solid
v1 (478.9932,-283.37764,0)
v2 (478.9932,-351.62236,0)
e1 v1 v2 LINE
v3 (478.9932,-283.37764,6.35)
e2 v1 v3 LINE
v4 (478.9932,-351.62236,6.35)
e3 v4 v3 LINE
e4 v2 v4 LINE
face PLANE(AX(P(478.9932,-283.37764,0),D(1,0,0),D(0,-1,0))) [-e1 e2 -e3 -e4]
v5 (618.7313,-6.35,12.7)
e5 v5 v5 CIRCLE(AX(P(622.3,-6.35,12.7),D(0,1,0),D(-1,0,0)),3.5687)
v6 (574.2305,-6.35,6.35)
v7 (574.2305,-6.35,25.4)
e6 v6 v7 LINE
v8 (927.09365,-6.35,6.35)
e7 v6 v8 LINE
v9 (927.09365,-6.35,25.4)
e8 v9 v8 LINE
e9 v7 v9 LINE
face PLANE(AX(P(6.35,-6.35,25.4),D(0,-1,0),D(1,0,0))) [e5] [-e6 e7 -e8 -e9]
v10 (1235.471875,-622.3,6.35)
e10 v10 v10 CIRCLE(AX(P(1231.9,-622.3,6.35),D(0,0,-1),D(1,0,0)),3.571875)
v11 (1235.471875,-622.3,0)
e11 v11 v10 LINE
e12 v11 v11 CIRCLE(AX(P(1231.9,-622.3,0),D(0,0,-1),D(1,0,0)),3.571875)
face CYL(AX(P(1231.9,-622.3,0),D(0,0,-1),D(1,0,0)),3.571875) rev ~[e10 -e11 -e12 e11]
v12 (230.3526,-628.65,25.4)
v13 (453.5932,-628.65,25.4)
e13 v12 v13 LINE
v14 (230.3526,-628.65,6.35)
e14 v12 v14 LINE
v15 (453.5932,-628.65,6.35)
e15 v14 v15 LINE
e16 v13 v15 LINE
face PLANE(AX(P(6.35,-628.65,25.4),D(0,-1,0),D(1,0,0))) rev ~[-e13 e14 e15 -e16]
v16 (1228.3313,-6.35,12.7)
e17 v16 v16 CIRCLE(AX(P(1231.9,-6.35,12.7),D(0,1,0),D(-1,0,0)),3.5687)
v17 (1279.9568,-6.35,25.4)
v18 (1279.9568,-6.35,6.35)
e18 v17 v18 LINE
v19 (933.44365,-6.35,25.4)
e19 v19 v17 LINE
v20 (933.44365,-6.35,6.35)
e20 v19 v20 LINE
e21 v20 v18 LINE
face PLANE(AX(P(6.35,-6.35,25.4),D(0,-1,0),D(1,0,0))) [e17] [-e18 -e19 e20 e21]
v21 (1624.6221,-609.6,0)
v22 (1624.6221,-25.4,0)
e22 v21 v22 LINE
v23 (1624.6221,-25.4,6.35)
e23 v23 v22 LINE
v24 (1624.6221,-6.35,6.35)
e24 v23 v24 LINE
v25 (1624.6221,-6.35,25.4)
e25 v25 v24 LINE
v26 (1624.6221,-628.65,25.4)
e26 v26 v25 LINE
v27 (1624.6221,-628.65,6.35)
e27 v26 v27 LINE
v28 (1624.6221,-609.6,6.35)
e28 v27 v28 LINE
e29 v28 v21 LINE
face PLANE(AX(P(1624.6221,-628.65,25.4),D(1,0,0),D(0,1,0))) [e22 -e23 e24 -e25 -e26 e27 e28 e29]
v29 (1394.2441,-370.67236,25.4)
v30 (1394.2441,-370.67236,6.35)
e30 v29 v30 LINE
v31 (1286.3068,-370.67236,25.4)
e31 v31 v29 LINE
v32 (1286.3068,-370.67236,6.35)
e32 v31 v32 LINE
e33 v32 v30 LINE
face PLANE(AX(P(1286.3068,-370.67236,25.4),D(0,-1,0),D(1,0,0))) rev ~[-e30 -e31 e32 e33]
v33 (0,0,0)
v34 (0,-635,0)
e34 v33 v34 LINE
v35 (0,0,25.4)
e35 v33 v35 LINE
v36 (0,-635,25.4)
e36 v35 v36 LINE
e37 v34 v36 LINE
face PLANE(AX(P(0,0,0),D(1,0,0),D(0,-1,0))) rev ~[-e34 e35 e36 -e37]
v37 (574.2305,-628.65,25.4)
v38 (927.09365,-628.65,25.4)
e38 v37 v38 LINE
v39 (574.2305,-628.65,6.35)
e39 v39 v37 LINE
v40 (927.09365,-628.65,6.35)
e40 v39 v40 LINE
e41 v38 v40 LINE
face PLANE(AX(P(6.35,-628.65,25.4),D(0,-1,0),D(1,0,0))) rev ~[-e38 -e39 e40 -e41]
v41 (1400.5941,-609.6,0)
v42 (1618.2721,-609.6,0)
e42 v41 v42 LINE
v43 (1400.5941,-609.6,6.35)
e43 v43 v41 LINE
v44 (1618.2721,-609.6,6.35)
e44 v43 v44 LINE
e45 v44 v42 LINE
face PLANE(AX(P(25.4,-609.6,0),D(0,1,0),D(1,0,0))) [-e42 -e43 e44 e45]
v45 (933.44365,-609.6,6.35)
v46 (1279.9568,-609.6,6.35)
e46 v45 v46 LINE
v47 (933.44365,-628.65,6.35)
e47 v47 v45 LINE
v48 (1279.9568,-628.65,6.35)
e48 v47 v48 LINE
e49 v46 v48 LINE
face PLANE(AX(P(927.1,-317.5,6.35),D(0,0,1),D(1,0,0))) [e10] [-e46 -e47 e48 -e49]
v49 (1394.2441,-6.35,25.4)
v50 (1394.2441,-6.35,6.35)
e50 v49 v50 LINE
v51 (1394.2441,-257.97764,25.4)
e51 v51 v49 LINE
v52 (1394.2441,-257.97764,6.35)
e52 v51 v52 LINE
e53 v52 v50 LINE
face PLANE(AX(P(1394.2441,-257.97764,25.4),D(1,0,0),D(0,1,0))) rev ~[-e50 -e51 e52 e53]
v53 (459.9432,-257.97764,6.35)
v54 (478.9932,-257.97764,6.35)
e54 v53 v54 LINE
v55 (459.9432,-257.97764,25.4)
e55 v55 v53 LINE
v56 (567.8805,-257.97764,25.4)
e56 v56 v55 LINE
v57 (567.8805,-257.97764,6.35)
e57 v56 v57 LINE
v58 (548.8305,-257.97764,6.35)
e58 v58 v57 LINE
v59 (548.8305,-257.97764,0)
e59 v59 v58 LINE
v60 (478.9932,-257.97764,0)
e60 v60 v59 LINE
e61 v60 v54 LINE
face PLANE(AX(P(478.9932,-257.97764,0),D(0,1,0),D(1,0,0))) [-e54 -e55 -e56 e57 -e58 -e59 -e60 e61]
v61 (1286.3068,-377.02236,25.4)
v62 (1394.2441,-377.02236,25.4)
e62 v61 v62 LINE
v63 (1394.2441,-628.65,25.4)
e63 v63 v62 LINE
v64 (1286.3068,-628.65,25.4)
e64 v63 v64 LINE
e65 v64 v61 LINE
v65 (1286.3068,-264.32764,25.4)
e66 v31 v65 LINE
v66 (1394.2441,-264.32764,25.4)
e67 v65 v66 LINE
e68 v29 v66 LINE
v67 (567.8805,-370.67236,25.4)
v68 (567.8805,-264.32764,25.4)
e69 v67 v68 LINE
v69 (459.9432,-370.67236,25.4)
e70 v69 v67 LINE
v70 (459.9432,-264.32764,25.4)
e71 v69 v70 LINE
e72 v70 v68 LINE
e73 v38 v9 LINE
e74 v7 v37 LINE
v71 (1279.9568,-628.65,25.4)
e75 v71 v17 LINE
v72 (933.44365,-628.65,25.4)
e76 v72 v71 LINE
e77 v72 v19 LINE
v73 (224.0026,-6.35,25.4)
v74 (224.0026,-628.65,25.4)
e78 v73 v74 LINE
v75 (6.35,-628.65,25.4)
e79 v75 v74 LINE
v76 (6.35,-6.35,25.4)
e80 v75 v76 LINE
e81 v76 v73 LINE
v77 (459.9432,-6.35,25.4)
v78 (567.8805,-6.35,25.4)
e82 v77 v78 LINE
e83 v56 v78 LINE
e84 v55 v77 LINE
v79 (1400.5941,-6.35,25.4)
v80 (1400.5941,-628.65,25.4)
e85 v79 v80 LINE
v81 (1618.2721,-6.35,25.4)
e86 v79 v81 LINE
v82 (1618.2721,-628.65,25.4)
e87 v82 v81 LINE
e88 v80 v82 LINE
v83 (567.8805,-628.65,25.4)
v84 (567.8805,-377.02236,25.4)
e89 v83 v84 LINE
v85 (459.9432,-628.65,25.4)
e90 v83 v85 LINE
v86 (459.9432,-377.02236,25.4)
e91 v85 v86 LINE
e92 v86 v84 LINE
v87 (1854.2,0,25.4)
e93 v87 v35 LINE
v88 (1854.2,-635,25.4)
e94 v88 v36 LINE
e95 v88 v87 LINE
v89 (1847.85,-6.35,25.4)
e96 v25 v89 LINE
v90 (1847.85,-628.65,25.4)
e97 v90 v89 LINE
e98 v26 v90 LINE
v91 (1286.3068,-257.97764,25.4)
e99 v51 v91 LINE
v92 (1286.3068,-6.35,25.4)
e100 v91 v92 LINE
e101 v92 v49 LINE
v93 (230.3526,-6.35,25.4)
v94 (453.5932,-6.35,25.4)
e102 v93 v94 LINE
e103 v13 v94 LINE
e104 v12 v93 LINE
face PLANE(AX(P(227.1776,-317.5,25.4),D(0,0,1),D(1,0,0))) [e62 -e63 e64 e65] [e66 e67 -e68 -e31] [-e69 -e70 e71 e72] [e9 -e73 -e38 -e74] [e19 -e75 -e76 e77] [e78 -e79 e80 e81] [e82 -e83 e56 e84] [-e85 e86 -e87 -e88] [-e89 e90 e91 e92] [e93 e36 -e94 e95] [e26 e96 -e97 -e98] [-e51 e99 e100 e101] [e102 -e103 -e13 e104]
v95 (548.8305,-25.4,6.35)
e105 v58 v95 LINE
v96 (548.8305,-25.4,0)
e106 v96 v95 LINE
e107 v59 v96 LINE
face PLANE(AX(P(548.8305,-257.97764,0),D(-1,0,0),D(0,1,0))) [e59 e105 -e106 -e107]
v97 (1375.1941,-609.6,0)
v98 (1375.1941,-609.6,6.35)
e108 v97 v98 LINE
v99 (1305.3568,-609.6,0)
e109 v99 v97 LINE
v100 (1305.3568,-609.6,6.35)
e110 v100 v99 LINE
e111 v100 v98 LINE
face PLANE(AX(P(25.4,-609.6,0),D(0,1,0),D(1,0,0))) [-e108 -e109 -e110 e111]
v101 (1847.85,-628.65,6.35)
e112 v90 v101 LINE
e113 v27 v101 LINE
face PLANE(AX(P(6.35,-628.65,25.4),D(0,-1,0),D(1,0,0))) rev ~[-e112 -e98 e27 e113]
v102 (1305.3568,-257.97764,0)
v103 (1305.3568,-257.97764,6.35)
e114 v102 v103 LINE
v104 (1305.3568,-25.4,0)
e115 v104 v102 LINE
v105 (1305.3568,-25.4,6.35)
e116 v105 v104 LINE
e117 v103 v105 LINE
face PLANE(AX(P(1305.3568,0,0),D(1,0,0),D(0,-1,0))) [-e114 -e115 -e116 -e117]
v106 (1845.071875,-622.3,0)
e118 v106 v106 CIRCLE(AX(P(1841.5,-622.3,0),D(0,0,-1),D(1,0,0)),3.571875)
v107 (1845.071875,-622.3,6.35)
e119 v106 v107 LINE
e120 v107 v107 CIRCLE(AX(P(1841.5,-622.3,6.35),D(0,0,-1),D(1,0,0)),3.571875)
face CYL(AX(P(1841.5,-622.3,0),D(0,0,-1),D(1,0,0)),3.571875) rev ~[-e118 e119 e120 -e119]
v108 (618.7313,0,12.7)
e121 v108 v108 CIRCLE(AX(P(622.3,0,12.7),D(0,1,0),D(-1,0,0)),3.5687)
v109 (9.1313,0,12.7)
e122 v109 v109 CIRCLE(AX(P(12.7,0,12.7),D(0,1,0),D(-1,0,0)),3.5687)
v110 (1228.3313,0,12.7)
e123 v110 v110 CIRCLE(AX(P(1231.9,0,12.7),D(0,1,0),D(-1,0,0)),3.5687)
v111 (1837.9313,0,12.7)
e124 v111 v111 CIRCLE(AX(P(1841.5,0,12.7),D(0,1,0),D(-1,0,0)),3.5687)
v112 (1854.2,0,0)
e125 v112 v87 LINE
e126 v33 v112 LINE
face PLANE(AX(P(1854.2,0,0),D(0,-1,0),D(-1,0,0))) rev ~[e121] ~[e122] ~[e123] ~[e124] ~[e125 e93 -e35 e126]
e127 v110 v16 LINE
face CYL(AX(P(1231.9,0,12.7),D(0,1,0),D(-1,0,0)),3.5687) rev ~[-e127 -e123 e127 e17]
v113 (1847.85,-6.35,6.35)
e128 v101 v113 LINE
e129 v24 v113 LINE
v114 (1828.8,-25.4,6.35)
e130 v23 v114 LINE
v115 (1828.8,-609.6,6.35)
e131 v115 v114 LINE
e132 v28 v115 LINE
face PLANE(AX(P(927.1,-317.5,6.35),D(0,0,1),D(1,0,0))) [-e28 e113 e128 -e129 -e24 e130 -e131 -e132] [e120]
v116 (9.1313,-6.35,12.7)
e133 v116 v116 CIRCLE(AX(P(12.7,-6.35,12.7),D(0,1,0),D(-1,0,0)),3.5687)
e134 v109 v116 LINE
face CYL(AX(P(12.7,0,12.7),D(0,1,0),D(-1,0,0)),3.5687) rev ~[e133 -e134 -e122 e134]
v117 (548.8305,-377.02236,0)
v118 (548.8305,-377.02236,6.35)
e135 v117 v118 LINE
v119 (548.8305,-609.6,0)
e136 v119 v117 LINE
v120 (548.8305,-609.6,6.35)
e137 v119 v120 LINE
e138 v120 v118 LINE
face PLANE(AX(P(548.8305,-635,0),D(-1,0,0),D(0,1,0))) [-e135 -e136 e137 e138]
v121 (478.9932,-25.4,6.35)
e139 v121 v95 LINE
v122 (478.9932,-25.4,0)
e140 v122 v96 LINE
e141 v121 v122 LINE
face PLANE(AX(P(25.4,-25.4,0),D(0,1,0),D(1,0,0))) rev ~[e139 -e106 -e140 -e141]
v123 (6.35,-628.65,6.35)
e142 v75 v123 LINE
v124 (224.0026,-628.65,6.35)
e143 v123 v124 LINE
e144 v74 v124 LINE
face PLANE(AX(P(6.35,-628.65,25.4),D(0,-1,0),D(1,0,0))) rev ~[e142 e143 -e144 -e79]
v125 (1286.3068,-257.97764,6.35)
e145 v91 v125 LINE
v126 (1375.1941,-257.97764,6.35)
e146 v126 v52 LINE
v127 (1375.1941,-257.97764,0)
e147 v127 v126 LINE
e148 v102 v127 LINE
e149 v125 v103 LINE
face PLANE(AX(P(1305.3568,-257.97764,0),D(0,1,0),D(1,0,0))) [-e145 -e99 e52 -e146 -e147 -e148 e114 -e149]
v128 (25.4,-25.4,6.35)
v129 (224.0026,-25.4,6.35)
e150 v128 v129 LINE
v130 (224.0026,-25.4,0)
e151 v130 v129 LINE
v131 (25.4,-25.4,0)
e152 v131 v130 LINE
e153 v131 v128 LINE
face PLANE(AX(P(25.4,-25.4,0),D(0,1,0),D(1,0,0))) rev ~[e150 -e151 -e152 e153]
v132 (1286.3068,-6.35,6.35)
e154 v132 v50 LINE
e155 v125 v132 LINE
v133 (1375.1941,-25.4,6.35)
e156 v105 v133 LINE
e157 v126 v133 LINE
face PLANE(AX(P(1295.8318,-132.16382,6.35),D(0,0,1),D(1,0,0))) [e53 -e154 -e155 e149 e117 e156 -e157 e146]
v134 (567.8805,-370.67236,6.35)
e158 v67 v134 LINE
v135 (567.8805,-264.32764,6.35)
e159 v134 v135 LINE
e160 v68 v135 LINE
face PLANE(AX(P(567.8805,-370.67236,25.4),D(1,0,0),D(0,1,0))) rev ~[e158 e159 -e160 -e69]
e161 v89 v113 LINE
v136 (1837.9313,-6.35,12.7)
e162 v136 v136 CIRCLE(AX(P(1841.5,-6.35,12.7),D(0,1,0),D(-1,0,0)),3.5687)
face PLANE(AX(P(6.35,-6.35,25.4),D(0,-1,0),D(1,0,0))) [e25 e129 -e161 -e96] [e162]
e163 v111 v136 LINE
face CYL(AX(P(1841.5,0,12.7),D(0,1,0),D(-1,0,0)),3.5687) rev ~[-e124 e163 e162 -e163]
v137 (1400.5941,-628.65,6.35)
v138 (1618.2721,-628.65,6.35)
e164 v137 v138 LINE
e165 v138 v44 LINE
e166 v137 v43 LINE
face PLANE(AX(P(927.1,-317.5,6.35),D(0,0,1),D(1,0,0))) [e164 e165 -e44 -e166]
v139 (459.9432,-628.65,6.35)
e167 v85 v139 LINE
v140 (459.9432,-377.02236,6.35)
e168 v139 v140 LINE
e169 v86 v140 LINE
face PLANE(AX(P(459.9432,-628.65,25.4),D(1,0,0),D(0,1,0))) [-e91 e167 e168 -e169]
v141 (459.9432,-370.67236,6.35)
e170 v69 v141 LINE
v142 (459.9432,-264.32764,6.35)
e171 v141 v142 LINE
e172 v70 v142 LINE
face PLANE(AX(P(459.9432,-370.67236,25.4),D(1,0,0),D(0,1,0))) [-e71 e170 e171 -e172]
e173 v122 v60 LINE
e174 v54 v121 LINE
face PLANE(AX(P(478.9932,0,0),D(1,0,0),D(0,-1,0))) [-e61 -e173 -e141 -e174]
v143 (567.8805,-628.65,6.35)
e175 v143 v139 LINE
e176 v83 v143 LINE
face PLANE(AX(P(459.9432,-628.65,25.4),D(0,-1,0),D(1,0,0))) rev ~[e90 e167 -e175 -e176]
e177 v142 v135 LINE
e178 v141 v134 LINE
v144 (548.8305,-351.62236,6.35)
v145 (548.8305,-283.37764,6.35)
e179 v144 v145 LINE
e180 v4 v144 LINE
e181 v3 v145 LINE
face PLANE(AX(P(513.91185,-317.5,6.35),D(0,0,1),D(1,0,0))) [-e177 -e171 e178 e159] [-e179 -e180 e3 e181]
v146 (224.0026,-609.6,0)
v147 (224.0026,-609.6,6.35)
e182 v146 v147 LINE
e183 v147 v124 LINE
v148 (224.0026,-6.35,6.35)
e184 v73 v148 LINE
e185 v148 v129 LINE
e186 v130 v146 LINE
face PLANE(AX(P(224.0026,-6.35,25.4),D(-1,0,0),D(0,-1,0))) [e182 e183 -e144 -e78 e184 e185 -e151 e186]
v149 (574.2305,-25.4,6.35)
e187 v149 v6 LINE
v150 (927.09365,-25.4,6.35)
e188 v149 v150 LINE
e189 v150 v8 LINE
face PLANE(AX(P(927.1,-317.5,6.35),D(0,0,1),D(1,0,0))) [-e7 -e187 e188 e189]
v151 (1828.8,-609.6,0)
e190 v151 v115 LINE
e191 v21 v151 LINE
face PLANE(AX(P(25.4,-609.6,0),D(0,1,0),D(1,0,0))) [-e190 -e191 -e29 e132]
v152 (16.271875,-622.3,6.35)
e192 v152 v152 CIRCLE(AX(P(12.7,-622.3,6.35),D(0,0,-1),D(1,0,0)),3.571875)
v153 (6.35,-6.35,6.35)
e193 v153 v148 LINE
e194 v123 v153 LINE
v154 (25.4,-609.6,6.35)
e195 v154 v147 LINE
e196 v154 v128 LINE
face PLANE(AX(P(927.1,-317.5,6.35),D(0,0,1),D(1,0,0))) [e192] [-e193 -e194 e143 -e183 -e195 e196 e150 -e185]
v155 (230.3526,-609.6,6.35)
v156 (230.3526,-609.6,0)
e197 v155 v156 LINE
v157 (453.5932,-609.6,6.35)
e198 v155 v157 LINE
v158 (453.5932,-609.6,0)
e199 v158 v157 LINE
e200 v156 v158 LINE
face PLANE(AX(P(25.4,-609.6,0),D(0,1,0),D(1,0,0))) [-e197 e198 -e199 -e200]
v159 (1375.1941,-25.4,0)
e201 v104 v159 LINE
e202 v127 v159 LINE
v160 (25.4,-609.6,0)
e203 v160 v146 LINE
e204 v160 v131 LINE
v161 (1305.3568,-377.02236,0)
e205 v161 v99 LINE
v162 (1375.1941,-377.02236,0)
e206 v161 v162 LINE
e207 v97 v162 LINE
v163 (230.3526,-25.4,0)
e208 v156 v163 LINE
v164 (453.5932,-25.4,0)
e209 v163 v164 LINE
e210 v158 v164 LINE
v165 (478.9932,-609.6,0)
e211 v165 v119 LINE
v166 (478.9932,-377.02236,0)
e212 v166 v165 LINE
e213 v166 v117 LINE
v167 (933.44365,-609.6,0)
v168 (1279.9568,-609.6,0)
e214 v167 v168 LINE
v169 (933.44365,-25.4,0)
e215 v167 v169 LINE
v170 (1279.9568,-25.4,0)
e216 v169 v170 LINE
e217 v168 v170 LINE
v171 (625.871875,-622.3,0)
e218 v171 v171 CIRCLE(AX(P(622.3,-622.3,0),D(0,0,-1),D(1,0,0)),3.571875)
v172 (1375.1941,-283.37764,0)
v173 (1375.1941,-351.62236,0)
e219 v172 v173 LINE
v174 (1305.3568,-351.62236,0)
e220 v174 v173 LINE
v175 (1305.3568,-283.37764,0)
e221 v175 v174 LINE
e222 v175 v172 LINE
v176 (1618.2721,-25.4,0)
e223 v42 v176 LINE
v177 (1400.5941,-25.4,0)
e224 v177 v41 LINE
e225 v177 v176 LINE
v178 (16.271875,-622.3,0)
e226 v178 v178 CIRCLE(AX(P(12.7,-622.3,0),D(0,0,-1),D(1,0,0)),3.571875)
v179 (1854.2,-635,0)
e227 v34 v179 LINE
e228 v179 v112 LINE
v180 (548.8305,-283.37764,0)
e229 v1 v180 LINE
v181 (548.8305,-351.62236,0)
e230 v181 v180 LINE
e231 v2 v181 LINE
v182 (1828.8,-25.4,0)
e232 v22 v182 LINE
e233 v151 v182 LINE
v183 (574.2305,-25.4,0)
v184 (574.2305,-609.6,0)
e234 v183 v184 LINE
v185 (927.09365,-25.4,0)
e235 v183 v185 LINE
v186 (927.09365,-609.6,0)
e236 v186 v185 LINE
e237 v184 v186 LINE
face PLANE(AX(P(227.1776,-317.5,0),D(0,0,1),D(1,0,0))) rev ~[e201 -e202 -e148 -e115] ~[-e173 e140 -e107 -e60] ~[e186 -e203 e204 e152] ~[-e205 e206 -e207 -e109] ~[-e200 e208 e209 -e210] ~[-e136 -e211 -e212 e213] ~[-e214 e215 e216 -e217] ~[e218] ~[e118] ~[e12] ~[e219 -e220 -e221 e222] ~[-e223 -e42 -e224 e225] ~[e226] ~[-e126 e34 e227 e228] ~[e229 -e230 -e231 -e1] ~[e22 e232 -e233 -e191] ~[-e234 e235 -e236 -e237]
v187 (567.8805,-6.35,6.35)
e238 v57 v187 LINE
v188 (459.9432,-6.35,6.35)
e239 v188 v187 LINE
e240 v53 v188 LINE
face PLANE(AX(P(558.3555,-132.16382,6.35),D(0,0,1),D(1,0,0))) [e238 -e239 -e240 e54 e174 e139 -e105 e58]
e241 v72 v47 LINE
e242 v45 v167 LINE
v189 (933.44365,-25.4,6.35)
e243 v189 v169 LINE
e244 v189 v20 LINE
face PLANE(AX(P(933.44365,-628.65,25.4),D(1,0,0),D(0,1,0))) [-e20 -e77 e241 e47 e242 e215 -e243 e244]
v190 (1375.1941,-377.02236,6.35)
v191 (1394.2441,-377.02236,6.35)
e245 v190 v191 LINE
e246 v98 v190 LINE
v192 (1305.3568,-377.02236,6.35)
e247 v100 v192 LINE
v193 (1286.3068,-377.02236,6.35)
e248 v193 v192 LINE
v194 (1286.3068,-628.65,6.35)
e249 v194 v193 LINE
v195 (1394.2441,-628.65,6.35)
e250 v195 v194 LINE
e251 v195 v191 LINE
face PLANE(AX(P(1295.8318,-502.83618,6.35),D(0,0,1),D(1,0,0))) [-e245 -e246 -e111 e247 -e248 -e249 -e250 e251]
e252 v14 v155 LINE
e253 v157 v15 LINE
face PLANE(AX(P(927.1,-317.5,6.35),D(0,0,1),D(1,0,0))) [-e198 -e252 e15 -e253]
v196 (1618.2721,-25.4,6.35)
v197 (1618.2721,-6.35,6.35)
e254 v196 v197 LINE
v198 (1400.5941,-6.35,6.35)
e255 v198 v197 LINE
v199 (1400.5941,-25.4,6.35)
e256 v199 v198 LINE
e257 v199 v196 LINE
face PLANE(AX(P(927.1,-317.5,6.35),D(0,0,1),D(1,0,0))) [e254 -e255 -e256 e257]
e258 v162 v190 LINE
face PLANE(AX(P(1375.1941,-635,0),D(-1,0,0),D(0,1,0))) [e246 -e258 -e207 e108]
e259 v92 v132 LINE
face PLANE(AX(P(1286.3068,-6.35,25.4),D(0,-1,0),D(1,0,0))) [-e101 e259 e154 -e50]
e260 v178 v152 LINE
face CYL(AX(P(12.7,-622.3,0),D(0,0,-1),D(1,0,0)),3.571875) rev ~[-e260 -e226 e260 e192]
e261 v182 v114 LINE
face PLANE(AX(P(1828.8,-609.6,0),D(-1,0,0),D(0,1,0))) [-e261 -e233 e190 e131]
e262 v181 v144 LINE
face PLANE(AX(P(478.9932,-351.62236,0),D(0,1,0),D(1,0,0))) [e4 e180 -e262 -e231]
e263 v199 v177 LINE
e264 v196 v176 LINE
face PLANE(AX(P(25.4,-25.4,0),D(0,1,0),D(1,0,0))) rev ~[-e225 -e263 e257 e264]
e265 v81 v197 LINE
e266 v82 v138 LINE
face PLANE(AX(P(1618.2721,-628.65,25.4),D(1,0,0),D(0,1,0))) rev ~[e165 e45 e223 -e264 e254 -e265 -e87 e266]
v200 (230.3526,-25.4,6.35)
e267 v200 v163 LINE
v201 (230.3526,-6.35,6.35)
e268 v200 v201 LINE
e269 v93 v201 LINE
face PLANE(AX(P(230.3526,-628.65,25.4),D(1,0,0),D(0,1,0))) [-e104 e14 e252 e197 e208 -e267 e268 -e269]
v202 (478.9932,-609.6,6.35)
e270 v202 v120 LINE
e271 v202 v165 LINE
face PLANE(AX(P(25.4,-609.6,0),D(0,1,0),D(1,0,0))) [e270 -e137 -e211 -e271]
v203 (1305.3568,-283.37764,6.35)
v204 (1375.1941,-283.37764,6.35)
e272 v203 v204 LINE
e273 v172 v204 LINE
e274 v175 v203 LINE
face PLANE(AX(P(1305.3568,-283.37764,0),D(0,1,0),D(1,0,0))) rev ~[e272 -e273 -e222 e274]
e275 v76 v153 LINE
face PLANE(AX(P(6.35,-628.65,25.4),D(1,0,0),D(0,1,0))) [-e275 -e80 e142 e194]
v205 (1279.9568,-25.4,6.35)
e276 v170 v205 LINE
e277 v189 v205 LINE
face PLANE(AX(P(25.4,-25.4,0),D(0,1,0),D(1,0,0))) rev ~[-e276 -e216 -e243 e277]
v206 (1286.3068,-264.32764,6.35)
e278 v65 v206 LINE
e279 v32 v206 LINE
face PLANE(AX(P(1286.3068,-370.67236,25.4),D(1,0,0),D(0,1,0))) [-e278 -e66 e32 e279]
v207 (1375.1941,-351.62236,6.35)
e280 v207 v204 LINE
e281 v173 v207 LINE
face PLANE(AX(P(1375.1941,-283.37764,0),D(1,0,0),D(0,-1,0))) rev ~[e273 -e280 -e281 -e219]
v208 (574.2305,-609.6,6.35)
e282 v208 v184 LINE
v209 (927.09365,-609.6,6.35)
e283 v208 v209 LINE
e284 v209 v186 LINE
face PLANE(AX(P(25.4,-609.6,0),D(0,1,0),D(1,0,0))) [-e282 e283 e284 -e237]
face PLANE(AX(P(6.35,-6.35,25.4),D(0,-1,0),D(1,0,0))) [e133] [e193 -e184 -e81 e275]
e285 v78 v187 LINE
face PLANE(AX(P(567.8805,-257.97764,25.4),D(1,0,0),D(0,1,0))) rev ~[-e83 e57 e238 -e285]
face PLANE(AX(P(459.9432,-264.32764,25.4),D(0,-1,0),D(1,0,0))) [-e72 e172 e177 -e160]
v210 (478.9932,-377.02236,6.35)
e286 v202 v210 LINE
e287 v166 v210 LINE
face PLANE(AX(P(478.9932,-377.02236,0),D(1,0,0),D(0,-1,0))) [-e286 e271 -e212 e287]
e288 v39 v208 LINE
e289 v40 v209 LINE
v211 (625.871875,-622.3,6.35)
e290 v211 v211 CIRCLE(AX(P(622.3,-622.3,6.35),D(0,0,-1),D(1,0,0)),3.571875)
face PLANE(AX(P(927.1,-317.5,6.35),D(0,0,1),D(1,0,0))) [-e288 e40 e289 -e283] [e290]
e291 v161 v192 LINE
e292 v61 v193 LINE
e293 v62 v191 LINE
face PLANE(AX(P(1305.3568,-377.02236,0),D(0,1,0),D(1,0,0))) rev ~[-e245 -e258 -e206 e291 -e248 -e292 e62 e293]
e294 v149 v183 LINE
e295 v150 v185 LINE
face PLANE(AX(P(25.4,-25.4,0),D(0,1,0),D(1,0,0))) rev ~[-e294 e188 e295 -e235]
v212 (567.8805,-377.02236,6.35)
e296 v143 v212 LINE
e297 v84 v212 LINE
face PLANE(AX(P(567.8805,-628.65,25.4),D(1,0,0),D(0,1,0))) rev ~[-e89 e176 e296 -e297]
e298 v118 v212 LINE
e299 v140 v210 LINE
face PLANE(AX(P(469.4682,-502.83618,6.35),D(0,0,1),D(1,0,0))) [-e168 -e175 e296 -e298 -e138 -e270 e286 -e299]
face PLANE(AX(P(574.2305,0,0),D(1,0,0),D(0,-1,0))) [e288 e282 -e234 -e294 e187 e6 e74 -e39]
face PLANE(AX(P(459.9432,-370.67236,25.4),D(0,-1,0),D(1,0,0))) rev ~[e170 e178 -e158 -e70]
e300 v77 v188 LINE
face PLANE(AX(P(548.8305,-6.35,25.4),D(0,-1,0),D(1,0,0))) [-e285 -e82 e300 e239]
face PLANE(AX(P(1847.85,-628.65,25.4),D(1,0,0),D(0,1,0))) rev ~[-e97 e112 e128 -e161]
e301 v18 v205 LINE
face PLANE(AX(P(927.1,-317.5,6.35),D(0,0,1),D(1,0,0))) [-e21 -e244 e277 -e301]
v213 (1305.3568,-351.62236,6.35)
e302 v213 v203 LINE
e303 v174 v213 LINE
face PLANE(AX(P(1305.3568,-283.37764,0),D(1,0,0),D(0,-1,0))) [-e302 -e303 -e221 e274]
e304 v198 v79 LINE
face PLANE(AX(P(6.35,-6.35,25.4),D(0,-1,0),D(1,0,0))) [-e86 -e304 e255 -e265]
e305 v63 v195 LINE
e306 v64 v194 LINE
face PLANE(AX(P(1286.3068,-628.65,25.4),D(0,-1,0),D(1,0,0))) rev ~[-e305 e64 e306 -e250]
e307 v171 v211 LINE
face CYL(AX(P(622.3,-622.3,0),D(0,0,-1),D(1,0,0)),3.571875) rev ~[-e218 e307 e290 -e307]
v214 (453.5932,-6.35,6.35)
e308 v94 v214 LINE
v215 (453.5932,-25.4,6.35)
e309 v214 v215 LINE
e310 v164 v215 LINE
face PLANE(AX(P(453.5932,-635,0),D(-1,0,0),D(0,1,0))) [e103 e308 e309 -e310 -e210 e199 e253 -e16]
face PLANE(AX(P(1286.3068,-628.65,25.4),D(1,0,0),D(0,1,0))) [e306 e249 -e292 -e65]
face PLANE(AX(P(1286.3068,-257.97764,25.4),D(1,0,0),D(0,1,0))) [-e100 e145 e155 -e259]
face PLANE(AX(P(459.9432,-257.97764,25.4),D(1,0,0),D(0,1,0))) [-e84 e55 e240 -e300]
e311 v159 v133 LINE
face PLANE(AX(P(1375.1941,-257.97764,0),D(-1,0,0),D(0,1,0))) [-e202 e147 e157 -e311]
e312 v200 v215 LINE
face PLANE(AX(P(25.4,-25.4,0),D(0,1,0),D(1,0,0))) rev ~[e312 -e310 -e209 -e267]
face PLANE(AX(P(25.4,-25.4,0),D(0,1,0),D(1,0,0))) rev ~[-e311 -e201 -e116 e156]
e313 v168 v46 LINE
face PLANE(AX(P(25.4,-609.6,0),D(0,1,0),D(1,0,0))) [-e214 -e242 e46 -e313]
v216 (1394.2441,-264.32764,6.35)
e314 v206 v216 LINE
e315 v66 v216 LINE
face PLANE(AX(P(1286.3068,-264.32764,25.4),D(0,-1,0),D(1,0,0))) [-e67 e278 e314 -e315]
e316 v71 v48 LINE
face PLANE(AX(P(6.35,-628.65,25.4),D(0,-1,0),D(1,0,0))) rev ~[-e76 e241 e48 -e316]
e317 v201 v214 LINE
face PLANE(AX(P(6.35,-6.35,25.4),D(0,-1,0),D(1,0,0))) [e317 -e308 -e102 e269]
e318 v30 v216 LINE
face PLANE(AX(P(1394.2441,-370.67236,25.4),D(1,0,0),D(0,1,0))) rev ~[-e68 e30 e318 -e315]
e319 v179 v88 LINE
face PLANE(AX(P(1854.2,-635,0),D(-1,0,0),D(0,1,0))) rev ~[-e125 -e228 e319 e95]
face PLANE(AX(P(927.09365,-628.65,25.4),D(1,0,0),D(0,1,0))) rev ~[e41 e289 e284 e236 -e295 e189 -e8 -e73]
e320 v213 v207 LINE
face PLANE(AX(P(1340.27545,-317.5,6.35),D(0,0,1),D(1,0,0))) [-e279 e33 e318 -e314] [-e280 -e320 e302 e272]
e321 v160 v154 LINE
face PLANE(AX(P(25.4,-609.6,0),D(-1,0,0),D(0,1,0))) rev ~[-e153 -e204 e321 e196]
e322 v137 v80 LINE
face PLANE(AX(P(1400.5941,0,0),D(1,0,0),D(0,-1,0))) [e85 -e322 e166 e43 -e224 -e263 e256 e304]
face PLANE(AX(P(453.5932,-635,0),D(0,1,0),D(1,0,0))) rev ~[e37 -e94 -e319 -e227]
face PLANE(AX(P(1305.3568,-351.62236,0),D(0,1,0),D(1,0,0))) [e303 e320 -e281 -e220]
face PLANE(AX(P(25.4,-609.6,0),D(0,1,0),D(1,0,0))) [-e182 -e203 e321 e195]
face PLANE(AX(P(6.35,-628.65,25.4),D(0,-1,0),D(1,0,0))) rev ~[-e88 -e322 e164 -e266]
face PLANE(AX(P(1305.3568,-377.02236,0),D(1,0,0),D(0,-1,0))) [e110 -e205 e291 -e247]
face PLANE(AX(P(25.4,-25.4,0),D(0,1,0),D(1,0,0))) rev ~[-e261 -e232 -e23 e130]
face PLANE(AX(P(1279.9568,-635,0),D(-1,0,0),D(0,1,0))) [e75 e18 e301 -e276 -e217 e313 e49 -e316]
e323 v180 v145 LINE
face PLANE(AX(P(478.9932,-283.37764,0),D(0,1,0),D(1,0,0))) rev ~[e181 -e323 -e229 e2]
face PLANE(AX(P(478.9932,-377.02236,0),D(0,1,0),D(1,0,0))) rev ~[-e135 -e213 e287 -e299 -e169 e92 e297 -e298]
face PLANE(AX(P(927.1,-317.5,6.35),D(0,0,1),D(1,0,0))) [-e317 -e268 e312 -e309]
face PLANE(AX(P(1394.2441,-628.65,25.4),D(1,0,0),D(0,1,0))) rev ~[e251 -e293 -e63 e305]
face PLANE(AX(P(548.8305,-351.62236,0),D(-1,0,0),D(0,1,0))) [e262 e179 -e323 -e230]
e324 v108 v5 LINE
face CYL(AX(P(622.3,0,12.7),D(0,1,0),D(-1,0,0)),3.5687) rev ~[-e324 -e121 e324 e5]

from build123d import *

# Parameters (mm, degrees)
F0_W      = 25.4
F0_H      = 25.4
F0_W_2    = 1803.4
F0_H_2    = 584.2
F1_DEPTH  = 25.4
F2_W      = 1841.5
F2_H      = 622.3
F2_W_2    = 1803.4
F2_H_2    = 584.2
F3_DEPTH  = 19.05
F4_W      = 25.4
F4_H      = 232.57764
F4_H_2    = 25.4
F4_W_2    = 69.8373
F4_H_3    = 68.24472
F5_DEPTH  = 25.4
F6_W      = 19.05
F6_H      = 251.62764
F6_W_2    = 107.9373
F6_H_2    = 106.34472
F6_W_3    = 69.8373
F6_H_3    = 68.24472
F7_DEPTH  = 19.05
F8_R      = 3.571875
F9_DEPTH  = 25.4
F10_R     = 3.5687
F11_DEPTH = 25.4
F12_W     = 6.35
F12_H     = 622.3
F13_DEPTH = 25.4


# Not quite as in the source:
# - a feature names something its author has since deleted; it is built from what else it names


with BuildPart() as f1:
    # F0 (on Top) → F1 (new body)
    with BuildSketch(Plane.XY):
        with Locations((12.7, -12.7)):
            Rectangle(F0_W, F0_H)
        with Locations((927.1, -12.7)):
            Rectangle(F0_W_2, F0_H)
        with Locations((12.7, -317.5)):
            Rectangle(F0_W, F0_H_2)
        with Locations((1841.5, -12.7)):
            Rectangle(F0_W, F0_H)
        with Locations((12.7, -622.3)):
            Rectangle(F0_W, F0_H)
        with Locations((1841.5, -317.5)):
            Rectangle(F0_W, F0_H_2)
        with Locations((927.1, -622.3)):
            Rectangle(F0_W_2, F0_H)
        with Locations((1841.5, -622.3)):
            Rectangle(F0_W, F0_H)
    extrude(amount=F1_DEPTH)

    # F2 (on face) → F3 (cut)
    with BuildSketch(Plane.XY.offset(25.4)):
        with Locations((927.1, -317.5)):
            Rectangle(F2_W, F2_H)
        with Locations((927.1, -317.5)):
            Rectangle(F2_W_2, F2_H_2, mode=Mode.SUBTRACT)
    extrude(amount=-F3_DEPTH, mode=Mode.SUBTRACT)

    # F4 (on face) → F5 (join)
    with BuildSketch(Plane(origin=(0, 0, 0), x_dir=(1, 0, 0), z_dir=(0, 0, -1))):
        with Locations((466.2932, 493.31118)):
            Rectangle(F4_W, F4_H)
        with Locations((466.2932, 622.3)):
            Rectangle(F4_W, F4_H_2)
        with Locations((561.5305, 622.3)):
            Rectangle(F4_W, F4_H_2)
        with Locations((561.5305, 493.31118)):
            Rectangle(F4_W, F4_H)
        with Locations((561.5305, 364.32236)):
            Rectangle(F4_W, F4_H_2)
        with Locations((513.91185, 364.32236)):
            Rectangle(F4_W_2, F4_H_2)
        with Locations((466.2932, 364.32236)):
            Rectangle(F4_W, F4_H_2)
        with Locations((466.2932, 317.5)):
            Rectangle(F4_W, F4_H_3)
        with Locations((561.5305, 317.5)):
            Rectangle(F4_W, F4_H_3)
        with Locations((561.5305, 270.67764)):
            Rectangle(F4_W, F4_H_2)
        with Locations((513.91185, 270.67764)):
            Rectangle(F4_W_2, F4_H_2)
        with Locations((466.2932, 270.67764)):
            Rectangle(F4_W, F4_H_2)
        with Locations((466.2932, 141.68882)):
            Rectangle(F4_W, F4_H)
        with Locations((466.2932, 12.7)):
            Rectangle(F4_W, F4_H_2)
        with Locations((561.5305, 12.7)):
            Rectangle(F4_W, F4_H_2)
        with Locations((561.5305, 141.68882)):
            Rectangle(F4_W, F4_H)
        with Locations((1292.6568, 317.5)):
            Rectangle(F4_W, F4_H_3)
        with Locations((1292.6568, 622.3)):
            Rectangle(F4_W, F4_H_2)
        with Locations((1387.8941, 622.3)):
            Rectangle(F4_W, F4_H_2)
        with Locations((1292.6568, 493.31118)):
            Rectangle(F4_W, F4_H)
        with Locations((1387.8941, 493.31118)):
            Rectangle(F4_W, F4_H)
        with Locations((1340.27545, 364.32236)):
            Rectangle(F4_W_2, F4_H_2)
        with Locations((1387.8941, 317.5)):
            Rectangle(F4_W, F4_H_3)
        with Locations((1387.8941, 364.32236)):
            Rectangle(F4_W, F4_H_2)
        with Locations((1292.6568, 364.32236)):
            Rectangle(F4_W, F4_H_2)
        with Locations((1292.6568, 270.67764)):
            Rectangle(F4_W, F4_H_2)
        with Locations((1340.27545, 270.67764)):
            Rectangle(F4_W_2, F4_H_2)
        with Locations((1387.8941, 270.67764)):
            Rectangle(F4_W, F4_H_2)
        with Locations((1387.8941, 141.68882)):
            Rectangle(F4_W, F4_H)
        with Locations((1292.6568, 141.68882)):
            Rectangle(F4_W, F4_H)
        with Locations((1292.6568, 12.7)):
            Rectangle(F4_W, F4_H_2)
        with Locations((1387.8941, 12.7)):
            Rectangle(F4_W, F4_H_2)
    extrude(amount=-F5_DEPTH)

    # F6 (on face) → F7 (cut)
    with BuildSketch(Plane.XY.offset(25.4)):
        with Locations((1295.8318, -132.16382)):
            Rectangle(F6_W, F6_H)
        with Locations((1384.7191, -132.16382)):
            Rectangle(F6_W, F6_H)
        with Locations((1340.27545, -317.5)):
            Rectangle(F6_W_2, F6_H_2)
        with Locations((1340.27545, -317.5)):
            Rectangle(F6_W_3, F6_H_3, mode=Mode.SUBTRACT)
        with Locations((1384.7191, -502.83618)):
            Rectangle(F6_W, F6_H)
        with Locations((1295.8318, -502.83618)):
            Rectangle(F6_W, F6_H)
        with Locations((558.3555, -502.83618)):
            Rectangle(F6_W, F6_H)
        with Locations((469.4682, -502.83618)):
            Rectangle(F6_W, F6_H)
        with Locations((513.91185, -317.5)):
            Rectangle(F6_W_2, F6_H_2)
        with Locations((513.91185, -317.5)):
            Rectangle(F6_W_3, F6_H_3, mode=Mode.SUBTRACT)
        with Locations((469.4682, -132.16382)):
            Rectangle(F6_W, F6_H)
        with Locations((558.3555, -132.16382)):
            Rectangle(F6_W, F6_H)
    extrude(amount=-F7_DEPTH, mode=Mode.SUBTRACT)

    # F8 (on face) → F9 (cut)
    with BuildSketch(Plane(origin=(0, 0, 0), x_dir=(1, 0, 0), z_dir=(0, 0, -1))):
        with Locations((12.7, 622.3)):
            Circle(F8_R)
        with Locations((622.3, 622.3)):
            Circle(F8_R)
        with Locations((1231.9, 622.3)):
            Circle(F8_R)
        with Locations((1841.5, 622.3)):
            Circle(F8_R)
    extrude(amount=-F9_DEPTH, mode=Mode.SUBTRACT)

    # F10 (on face) → F11 (cut)
    with BuildSketch(Plane(origin=(0, 0, 0), x_dir=(-1, 0, 0), z_dir=(0, 1, 0))):
        with Locations((-1841.5, 12.7)):
            Circle(F10_R)
        with Locations((-1231.9, 12.7)):
            Circle(F10_R)
        with Locations((-622.3, 12.7)):
            Circle(F10_R)
        with Locations((-12.7, 12.7)):
            Circle(F10_R)
    extrude(amount=-F11_DEPTH, mode=Mode.SUBTRACT)

    # F12 (on face) → F13 (join)
    with BuildSketch(Plane.XY.offset(25.4)):
        Polygon((230.3526, -6.35), (229.5906, -6.35), (224.0026, -6.35), (224.0026, -628.65), (229.5906, -628.65), (230.3526, -628.65), align=None)
        with Locations((930.26865, -317.5)):
            Rectangle(F12_W, F12_H)
        with Locations((1621.4471, -317.5)):
            Rectangle(F12_W, F12_H)
    extrude(amount=-F13_DEPTH)


solid = f1.part
